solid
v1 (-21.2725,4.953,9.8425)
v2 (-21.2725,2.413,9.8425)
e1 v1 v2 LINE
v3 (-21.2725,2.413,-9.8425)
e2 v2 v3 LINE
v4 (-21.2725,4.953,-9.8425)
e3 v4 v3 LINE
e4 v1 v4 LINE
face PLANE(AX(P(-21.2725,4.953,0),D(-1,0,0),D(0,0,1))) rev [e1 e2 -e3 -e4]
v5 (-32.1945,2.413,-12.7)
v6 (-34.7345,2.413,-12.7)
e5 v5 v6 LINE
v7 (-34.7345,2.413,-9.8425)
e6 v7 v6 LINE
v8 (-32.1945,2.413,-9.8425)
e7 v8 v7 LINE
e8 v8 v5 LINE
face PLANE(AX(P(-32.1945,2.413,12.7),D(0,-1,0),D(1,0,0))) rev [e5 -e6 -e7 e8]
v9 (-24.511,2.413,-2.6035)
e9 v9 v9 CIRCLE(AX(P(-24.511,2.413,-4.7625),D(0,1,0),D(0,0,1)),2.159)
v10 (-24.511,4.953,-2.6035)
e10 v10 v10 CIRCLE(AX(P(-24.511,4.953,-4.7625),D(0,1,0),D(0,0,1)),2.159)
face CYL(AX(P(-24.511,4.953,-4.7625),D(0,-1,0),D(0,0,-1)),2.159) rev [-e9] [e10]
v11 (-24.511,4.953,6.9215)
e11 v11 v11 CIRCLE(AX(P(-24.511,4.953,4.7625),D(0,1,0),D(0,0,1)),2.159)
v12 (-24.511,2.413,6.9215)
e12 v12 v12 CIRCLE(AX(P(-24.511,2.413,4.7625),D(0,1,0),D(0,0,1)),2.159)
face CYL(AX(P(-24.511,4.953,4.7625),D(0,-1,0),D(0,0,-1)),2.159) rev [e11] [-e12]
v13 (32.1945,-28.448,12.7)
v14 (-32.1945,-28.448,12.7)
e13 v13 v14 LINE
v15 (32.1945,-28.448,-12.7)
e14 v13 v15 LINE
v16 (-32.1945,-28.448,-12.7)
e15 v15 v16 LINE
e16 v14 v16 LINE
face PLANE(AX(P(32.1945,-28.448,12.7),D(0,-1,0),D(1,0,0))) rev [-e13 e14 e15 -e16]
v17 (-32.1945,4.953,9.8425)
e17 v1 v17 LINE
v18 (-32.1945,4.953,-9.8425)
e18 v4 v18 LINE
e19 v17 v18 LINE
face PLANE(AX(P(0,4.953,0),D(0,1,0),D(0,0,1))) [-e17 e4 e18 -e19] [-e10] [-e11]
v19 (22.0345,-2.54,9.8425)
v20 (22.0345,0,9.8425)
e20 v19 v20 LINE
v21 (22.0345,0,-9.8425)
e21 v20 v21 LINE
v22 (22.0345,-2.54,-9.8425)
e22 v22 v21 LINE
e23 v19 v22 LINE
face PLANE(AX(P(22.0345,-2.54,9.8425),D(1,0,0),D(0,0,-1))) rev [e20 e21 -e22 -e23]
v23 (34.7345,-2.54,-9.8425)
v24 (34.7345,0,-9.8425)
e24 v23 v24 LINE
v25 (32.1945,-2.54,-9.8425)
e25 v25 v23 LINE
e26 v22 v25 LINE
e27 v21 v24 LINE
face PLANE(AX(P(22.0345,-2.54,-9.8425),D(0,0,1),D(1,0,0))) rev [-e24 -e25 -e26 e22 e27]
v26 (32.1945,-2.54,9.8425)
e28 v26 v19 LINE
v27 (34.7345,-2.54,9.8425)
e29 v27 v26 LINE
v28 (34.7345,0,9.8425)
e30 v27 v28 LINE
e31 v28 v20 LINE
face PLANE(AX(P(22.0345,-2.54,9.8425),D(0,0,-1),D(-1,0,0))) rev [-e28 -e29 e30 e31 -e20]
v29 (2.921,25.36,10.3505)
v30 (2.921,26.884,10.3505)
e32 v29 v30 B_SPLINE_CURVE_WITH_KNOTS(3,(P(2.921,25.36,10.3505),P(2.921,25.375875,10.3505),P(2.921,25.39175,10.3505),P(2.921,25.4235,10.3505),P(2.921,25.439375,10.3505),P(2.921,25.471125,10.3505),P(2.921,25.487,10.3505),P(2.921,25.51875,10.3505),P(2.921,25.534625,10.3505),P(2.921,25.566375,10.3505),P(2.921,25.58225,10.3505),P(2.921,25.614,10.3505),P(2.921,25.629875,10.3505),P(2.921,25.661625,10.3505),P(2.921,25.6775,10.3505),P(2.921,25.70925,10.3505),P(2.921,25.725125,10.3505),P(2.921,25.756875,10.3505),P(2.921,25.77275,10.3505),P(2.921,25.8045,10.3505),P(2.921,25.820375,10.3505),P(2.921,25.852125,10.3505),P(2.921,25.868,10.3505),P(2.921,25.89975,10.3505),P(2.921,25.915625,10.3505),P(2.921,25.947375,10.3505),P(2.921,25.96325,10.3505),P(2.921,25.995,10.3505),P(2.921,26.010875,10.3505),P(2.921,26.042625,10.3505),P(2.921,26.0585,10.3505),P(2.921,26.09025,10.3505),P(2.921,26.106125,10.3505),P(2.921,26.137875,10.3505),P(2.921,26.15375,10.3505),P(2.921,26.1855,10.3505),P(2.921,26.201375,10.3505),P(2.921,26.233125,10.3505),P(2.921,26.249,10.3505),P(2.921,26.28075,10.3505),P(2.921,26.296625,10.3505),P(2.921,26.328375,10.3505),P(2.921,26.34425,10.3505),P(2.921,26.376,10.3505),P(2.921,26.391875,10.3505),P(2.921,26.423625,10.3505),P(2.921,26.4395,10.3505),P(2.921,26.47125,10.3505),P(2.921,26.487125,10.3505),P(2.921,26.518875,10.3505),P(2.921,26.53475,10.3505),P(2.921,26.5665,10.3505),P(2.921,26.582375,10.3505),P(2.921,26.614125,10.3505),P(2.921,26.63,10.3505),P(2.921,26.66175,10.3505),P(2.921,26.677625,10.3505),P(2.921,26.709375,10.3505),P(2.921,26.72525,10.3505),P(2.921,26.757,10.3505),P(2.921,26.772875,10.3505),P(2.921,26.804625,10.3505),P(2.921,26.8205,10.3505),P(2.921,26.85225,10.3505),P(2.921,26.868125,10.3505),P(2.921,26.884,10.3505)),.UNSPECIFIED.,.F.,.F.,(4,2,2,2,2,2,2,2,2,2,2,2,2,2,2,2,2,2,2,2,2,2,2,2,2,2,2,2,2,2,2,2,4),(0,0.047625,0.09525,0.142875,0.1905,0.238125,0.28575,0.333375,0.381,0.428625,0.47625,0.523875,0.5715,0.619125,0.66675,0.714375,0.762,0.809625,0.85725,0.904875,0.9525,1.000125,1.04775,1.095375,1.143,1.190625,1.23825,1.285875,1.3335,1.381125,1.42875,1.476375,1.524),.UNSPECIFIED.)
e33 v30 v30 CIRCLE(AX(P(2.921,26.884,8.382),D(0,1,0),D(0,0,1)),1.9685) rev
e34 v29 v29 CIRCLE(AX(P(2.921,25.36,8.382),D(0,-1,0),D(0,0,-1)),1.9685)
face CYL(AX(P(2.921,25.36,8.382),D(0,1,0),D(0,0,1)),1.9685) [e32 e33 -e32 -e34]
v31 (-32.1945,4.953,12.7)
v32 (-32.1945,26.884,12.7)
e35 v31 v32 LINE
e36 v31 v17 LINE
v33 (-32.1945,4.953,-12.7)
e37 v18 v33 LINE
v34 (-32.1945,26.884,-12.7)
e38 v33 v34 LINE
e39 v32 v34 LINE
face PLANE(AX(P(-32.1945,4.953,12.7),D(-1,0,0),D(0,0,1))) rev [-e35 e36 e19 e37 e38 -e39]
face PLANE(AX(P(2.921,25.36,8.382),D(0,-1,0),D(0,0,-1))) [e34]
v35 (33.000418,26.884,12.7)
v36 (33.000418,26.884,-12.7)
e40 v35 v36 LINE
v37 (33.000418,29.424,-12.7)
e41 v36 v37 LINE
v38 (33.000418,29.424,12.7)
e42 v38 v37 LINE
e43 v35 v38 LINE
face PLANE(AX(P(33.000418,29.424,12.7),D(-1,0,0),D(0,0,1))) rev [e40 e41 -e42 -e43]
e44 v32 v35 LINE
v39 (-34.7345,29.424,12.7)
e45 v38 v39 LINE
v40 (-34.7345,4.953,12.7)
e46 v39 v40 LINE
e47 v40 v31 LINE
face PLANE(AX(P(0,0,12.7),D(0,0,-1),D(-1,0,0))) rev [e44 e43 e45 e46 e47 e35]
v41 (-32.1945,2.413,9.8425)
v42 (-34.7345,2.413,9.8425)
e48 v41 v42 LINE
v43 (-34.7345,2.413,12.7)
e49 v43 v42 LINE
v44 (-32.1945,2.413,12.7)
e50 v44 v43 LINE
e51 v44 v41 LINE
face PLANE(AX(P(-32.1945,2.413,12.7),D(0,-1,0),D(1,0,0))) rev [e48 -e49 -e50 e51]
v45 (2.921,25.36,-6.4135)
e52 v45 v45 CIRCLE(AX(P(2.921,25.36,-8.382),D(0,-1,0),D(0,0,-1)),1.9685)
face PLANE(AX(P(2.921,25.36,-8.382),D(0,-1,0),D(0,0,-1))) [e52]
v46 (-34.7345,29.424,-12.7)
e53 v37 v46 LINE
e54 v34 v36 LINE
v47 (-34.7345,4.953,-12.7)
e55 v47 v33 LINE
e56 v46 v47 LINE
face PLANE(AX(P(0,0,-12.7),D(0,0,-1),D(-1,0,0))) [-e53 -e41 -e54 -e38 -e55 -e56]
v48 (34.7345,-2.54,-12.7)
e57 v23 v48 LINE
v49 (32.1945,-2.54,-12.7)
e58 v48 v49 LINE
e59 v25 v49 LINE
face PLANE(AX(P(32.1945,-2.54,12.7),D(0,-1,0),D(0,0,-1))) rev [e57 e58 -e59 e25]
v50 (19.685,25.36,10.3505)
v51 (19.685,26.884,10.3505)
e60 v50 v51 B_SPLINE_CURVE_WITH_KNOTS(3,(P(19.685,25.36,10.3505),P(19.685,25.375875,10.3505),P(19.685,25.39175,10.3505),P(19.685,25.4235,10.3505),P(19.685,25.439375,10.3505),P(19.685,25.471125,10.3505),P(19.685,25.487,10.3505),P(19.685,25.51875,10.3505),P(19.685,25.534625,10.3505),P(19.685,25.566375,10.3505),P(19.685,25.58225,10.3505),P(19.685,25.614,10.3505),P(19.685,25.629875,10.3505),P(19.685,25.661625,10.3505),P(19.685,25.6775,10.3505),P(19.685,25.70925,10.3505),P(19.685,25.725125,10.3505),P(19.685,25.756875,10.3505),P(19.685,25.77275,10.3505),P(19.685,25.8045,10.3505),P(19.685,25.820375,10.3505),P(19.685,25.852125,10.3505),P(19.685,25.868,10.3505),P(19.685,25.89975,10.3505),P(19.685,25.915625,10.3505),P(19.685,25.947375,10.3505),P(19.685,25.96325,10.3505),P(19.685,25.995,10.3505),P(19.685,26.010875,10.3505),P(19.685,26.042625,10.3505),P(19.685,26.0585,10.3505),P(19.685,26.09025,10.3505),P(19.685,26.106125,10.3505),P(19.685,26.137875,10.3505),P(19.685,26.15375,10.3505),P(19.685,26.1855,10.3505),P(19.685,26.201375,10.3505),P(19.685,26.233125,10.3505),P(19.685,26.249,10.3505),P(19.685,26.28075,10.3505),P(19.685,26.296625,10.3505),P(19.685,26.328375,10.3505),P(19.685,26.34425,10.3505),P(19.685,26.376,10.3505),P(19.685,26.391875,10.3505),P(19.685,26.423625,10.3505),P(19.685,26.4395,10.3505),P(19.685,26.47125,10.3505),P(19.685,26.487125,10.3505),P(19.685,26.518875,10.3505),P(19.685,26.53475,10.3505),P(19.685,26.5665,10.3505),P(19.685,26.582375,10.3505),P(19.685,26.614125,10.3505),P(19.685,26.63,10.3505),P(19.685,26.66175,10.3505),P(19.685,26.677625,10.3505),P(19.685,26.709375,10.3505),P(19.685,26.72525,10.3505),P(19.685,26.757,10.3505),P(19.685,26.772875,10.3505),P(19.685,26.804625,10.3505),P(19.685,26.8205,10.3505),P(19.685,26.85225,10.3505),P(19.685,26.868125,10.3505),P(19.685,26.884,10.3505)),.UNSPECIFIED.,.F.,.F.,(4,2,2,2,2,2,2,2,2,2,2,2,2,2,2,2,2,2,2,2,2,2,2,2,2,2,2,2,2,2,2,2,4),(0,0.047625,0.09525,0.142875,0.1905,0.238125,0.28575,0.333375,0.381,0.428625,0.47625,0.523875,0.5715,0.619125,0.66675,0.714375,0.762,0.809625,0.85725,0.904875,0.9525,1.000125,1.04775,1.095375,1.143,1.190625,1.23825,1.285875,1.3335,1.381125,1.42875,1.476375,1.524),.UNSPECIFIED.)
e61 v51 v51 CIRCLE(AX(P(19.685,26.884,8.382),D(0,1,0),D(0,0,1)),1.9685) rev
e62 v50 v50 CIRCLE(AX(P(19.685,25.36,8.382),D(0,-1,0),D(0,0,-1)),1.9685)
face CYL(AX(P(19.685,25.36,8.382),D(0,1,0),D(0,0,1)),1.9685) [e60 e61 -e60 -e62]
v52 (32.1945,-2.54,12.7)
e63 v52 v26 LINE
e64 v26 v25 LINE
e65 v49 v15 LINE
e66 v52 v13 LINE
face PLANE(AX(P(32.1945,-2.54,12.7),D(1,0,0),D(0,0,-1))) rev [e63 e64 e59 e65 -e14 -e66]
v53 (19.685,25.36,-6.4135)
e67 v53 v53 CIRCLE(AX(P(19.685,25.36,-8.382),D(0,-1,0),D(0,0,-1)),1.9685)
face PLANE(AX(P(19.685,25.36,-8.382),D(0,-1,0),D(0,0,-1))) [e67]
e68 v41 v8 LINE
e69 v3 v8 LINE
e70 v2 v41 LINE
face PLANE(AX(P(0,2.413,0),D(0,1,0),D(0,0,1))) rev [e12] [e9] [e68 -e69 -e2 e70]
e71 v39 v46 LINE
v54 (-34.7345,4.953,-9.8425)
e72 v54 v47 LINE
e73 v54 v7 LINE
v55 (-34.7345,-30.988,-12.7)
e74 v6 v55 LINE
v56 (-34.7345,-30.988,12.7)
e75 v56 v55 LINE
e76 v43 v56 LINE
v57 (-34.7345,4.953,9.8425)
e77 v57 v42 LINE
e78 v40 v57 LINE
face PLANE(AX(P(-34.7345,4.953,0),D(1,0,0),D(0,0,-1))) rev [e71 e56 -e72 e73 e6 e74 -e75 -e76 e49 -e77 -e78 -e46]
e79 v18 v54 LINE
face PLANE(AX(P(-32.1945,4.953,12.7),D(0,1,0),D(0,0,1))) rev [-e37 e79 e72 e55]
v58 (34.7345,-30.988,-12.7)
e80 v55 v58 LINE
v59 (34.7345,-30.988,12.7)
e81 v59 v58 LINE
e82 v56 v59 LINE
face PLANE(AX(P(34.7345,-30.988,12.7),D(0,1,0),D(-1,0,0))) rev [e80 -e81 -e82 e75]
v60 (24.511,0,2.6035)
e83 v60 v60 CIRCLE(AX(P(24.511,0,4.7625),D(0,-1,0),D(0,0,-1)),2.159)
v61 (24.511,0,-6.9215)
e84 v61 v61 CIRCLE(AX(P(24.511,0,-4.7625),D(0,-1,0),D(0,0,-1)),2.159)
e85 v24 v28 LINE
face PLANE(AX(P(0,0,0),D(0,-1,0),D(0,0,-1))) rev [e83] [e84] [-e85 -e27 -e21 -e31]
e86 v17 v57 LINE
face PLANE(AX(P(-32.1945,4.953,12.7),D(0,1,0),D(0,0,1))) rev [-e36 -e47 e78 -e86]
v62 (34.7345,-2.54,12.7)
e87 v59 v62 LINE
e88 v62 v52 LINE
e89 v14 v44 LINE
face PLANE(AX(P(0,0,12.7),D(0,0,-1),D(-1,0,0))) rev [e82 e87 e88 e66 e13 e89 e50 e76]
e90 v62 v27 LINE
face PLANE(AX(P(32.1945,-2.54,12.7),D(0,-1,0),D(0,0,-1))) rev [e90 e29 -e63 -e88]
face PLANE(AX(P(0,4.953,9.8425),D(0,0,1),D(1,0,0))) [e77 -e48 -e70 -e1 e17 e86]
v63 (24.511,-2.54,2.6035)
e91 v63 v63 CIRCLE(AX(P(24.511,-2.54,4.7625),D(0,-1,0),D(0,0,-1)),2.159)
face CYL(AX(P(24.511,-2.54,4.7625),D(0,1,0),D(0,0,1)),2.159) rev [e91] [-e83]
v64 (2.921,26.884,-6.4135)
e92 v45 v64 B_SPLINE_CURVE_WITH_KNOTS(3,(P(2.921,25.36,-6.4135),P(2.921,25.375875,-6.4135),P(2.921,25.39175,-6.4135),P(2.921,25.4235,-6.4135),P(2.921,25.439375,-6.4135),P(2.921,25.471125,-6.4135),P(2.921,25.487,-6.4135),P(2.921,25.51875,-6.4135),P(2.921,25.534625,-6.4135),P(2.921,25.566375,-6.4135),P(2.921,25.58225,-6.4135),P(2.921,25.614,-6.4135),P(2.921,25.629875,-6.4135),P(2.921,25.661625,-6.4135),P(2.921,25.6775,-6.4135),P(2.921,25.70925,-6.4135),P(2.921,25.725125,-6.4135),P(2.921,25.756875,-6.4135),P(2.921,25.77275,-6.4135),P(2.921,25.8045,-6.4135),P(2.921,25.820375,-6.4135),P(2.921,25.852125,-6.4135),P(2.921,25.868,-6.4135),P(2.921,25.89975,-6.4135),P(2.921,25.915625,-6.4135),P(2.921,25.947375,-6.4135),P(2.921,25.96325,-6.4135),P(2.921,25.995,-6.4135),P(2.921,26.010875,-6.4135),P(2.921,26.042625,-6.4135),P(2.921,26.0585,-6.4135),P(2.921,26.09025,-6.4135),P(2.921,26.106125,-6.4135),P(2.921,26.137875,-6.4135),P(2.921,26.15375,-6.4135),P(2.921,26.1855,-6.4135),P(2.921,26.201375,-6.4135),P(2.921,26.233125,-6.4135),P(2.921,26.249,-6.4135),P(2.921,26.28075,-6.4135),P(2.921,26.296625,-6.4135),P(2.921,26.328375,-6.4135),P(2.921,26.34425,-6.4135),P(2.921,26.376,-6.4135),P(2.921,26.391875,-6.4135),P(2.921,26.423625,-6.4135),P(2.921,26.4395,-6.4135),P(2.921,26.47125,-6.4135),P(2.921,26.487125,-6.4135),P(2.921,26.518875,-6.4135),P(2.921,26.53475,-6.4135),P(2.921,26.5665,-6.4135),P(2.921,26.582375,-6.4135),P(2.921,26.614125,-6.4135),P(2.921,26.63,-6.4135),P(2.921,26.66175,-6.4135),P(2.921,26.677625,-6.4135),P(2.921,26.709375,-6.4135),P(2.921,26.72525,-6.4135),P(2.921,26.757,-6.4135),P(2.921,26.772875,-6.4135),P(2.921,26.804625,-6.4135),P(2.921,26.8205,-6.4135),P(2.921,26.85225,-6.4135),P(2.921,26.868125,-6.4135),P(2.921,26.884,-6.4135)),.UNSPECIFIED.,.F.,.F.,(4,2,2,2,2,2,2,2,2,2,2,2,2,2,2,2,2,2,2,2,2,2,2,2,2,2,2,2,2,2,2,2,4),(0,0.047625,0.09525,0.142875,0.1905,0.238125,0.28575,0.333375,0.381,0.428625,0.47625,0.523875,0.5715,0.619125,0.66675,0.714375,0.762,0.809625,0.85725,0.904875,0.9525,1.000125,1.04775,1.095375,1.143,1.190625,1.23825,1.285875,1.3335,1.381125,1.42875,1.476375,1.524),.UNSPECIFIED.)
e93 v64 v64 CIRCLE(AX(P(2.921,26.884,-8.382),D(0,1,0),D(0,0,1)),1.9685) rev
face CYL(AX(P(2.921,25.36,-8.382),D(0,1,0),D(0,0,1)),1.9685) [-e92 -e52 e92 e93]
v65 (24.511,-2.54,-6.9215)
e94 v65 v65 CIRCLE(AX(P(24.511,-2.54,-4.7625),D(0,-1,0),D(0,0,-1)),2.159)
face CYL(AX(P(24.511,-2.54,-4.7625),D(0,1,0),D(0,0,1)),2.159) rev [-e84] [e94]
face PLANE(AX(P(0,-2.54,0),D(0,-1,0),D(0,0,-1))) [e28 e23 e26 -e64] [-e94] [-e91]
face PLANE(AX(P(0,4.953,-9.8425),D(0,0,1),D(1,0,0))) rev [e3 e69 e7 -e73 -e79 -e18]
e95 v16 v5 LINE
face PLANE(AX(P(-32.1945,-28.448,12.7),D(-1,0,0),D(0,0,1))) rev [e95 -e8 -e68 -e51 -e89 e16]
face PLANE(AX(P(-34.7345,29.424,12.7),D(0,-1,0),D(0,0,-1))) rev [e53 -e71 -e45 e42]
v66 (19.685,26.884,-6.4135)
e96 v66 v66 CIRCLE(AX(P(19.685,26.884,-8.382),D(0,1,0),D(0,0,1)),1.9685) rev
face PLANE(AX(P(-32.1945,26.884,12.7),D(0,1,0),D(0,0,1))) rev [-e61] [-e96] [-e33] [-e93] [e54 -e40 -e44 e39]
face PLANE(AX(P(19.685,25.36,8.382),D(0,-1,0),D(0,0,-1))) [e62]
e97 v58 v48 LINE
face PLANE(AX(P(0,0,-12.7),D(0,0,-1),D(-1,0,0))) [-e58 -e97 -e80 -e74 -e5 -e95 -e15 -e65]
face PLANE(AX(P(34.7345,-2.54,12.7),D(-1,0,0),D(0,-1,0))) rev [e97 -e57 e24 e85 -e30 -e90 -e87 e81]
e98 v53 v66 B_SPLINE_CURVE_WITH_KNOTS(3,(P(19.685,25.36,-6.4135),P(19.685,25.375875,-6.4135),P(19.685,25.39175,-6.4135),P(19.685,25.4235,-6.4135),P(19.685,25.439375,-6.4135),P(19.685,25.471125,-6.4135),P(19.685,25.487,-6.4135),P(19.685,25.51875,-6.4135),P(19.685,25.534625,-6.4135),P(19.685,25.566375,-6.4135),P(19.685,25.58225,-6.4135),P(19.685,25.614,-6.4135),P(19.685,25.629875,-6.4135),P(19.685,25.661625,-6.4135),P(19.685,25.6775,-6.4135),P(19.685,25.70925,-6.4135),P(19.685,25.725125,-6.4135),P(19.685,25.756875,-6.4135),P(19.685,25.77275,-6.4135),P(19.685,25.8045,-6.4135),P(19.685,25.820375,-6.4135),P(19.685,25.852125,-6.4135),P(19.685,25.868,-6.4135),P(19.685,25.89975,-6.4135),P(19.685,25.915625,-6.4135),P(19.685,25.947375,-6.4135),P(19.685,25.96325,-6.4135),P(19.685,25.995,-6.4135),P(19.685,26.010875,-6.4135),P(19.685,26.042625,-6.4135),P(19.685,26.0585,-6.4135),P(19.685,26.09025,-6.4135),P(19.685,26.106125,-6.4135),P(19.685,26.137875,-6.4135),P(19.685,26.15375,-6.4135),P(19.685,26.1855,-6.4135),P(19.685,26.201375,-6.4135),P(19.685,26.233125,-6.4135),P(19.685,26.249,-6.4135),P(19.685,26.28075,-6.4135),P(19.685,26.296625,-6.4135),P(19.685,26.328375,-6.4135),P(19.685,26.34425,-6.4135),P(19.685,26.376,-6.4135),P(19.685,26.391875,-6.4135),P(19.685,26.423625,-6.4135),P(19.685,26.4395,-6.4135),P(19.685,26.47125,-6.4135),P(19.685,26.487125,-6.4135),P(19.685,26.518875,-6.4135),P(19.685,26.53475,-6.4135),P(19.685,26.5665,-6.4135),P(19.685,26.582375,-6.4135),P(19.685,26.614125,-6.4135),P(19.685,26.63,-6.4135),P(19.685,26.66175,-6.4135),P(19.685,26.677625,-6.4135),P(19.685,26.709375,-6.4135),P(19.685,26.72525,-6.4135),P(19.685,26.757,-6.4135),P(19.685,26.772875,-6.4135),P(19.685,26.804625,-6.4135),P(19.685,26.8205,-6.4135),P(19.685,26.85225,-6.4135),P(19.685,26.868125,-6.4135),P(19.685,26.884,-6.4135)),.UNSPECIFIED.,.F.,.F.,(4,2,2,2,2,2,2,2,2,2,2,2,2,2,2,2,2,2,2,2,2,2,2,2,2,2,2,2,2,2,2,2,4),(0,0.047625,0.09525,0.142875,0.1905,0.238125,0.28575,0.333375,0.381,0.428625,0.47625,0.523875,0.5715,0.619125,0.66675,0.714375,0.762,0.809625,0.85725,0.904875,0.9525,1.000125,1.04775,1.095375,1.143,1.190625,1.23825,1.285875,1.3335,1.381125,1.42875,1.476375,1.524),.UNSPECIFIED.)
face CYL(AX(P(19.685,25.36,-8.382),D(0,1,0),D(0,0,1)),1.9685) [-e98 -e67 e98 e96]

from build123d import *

# Parameters (mm, degrees)
BOSS_EXTRUDE1_OUTLINE_W = 13.462
BOSS_EXTRUDE1_OUTLINE_H = 19.685
BOSS_EXTRUDE1_OUTLINE_R = 2.159
BOSS_EXTRUDE1_DEPTH     = 2.54
SKETCH2_W               = 12.7
SKETCH2_H               = 19.685
SKETCH2_R               = 2.159
BOSS_EXTRUDE2_DEPTH     = 2.54
BOSS_EXTRUDE3_DEPTH     = 12.7
SKETCH4_R               = 1.9685
BOSS_EXTRUDE4_DEPTH     = 1.524


# Read off the part's stored shape, not the designer's step: Boss-Extrude1
with BuildPart() as part:
    # Boss-Extrude1 outline → Boss-Extrude1 (new body)
    with BuildSketch(Plane(origin=(0, 2.413, 0), x_dir=(1, 0, 0), z_dir=(0, 1, 0))):
        with Locations((-28.0035, 0)):
            Rectangle(BOSS_EXTRUDE1_OUTLINE_W, BOSS_EXTRUDE1_OUTLINE_H)
        with Locations((-24.511, -4.7625)):
            Circle(BOSS_EXTRUDE1_OUTLINE_R, mode=Mode.SUBTRACT)
        with Locations((-24.511, 4.7625)):
            Circle(BOSS_EXTRUDE1_OUTLINE_R, mode=Mode.SUBTRACT)
    extrude(amount=BOSS_EXTRUDE1_DEPTH)



with BuildPart() as body_2:
    # Sketch2 → Boss-Extrude2 (new body)
    with BuildSketch(Plane.XZ):
        with Locations((28.3845, 0)):
            Rectangle(SKETCH2_W, SKETCH2_H)
        with Locations(Location((24.511, 4.7625, 0), (0, 0, 270))):
            Circle(SKETCH2_R, mode=Mode.SUBTRACT)
        with Locations(Location((24.511, -4.7625, 0), (0, 0, 270))):
            Circle(SKETCH2_R, mode=Mode.SUBTRACT)
    extrude(amount=BOSS_EXTRUDE2_DEPTH)


with BuildPart() as part_1:
    add(part.part)

    add(body_2.part)  # Boss-Extrude3 merges body 2
    # Sketch3 → Boss-Extrude3 (add, symmetric)
    with BuildSketch(Plane.XY):
        Polygon((34.7345, -2.54), (34.7345, -30.988), (-34.7345, -30.988), (-34.7345, 2.413), (-32.1945, 2.413), (-32.1945, -28.448), (32.1945, -28.448), (32.1945, -2.54), align=None)
        Polygon((-32.1945, 4.953), (-32.1945, 26.884), (33.000418385, 26.884), (33.000418385, 29.424), (-34.7345, 29.424), (-34.7345, 4.953), align=None)
    extrude(amount=BOSS_EXTRUDE3_DEPTH, both=True)

    # Sketch4 → Boss-Extrude4 (add)
    with BuildSketch(Plane.XZ.offset(-26.884)):
        with Locations(Location((2.921, -8.382, 0), (0, 0, 90))):
            Circle(SKETCH4_R)
        with Locations(Location((19.685, -8.382, 0), (0, 0, 90))):
            Circle(SKETCH4_R)
        with Locations(Location((19.685, 8.382, 0), (0, 0, 90))):
            Circle(SKETCH4_R)
        with Locations(Location((2.921, 8.382, 0), (0, 0, 90))):
            Circle(SKETCH4_R)
    extrude(amount=BOSS_EXTRUDE4_DEPTH)


solid = part_1.part
